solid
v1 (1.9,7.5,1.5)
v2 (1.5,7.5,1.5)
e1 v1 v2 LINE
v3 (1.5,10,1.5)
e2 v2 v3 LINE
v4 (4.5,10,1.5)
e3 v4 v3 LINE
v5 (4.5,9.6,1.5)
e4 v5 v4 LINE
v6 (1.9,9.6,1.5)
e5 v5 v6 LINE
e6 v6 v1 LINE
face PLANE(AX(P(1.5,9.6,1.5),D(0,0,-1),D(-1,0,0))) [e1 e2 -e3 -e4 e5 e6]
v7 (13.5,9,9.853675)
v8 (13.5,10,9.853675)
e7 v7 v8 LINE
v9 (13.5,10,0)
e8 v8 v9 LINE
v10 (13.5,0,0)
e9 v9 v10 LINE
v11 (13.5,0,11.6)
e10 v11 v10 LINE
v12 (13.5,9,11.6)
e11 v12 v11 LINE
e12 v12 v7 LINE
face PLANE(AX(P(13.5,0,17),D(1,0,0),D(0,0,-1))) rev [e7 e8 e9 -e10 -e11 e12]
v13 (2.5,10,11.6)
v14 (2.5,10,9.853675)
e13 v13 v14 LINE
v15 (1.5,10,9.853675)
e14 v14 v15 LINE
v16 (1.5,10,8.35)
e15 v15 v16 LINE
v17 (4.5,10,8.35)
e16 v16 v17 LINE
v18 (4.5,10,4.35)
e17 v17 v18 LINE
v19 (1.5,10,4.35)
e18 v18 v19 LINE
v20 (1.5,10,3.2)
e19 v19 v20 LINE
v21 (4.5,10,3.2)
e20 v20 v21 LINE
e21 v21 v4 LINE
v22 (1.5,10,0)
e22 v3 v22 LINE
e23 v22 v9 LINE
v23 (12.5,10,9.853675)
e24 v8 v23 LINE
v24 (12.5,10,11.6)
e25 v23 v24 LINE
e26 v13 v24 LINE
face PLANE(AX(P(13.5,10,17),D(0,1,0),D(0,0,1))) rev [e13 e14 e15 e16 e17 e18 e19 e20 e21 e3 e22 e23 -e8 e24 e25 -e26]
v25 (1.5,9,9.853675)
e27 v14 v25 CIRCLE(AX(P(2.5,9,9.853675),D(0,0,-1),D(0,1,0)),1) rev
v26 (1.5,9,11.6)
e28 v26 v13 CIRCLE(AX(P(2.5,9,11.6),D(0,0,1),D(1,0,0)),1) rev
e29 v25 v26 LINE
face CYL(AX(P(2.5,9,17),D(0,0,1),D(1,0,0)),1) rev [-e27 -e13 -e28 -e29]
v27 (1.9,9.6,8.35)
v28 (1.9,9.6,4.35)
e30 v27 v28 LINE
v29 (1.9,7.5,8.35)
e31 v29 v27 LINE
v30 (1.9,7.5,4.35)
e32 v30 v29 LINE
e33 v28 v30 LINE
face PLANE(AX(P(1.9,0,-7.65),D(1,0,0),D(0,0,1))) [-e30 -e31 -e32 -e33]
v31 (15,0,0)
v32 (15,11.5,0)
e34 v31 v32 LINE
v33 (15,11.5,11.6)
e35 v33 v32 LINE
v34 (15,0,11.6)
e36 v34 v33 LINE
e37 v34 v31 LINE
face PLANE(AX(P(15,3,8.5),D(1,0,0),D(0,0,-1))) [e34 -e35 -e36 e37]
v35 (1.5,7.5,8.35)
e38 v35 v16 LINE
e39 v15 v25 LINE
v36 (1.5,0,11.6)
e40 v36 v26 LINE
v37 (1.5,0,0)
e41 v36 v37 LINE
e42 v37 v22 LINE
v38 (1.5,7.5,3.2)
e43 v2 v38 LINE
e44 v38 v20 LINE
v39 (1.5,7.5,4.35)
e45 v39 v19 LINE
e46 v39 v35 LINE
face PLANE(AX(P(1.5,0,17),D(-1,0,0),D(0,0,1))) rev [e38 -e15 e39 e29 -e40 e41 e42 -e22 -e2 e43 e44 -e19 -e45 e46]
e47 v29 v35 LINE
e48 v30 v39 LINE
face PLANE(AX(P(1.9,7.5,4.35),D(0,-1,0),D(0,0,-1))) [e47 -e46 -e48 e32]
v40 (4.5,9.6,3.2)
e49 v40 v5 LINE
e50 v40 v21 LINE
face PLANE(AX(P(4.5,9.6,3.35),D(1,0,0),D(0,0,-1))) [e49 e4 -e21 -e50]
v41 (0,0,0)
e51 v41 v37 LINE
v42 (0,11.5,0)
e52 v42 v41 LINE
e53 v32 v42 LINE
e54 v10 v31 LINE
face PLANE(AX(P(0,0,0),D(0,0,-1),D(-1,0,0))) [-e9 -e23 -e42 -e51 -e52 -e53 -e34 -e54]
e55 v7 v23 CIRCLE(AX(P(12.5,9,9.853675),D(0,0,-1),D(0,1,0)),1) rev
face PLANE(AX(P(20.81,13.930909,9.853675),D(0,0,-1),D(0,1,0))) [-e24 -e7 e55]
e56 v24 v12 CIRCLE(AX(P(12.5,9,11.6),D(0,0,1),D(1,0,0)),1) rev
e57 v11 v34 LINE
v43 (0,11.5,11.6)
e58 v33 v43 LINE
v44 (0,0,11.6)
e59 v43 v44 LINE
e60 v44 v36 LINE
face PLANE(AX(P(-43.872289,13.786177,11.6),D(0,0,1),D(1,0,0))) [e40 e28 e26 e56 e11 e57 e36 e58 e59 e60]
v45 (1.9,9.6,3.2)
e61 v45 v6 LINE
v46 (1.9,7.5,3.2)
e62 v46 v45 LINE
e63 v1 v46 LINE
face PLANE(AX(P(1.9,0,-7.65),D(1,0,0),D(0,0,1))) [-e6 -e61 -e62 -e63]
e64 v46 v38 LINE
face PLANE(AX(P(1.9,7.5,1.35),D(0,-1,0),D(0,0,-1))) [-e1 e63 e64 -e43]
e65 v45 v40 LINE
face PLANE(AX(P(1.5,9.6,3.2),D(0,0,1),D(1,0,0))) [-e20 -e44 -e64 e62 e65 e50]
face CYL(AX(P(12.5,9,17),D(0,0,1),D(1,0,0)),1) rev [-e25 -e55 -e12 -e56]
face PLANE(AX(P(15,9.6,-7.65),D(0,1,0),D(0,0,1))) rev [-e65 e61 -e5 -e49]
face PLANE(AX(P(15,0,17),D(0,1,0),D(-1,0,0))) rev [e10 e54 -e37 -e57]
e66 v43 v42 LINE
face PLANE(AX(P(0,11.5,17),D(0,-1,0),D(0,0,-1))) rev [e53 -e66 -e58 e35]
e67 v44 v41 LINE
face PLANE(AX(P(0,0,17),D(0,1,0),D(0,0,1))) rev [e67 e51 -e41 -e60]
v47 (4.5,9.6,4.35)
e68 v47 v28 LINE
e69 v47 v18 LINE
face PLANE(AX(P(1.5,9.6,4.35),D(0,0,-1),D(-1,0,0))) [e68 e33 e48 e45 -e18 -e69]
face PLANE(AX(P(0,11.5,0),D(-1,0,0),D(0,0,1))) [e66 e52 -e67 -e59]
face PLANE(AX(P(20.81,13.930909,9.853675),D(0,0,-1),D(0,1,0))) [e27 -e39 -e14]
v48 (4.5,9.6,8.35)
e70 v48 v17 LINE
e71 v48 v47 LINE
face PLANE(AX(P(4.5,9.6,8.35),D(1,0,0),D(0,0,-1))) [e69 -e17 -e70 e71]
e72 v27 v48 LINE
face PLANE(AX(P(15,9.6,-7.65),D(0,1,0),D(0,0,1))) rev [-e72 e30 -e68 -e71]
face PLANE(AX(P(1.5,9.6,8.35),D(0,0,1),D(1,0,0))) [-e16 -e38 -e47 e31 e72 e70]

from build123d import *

# Parameters (mm, degrees)
BOSS_EXTRUDE1_DEPTH      = 17
SKETCH10_W               = 3
SKETCH10_H               = 4
SKETCH10_H_2             = 2
BOSS_EXTRUDE8_DEPTH      = 0.4
SKETCH11_W               = 2
SKETCH11_H               = 2.1
SKETCH11_W_2             = 4
BOSS_EXTRUDE9_DEPTH      = 0.4
FILLET5_R                = 0.4
SPLIT2_SURFACE_1_BACK    = 26.421
SPLIT2_SURFACE_1_DEPTH   = 52.842
SPLIT2_SURFACE_2_BACK    = 26.421
SPLIT2_SURFACE_2_DEPTH   = 52.842
FILLET6_R                = 1.5
SKETCH13_W               = 5.8
SKETCH13_H               = 8.5
BOSS_EXTRUDE10_DEPTH     = 3
FILLET7_R                = 4
SPLIT3_SURFACE_3_BACK    = 34.598
SPLIT3_SURFACE_3_DEPTH   = 69.196
SPLIT3_SURFACE_4_BACK    = 34.598
SPLIT3_SURFACE_4_DEPTH   = 69.196
CUT_EXTRUDE1_DEPTH       = 1.5
CUT_EXTRUDE2_DEPTH       = 29.664263465
DELETEFACE1_START        = 1.5
DELETEFACE1_DEPTH        = 12
CUT_EXTRUDE3_DEPTH       = 8
MOVE_START               = 1.5
MOVE_FACE1_OUTLINE_W     = 2.5
MOVE_FACE1_OUTLINE_H     = 4
MOVE_FACE1_OUTLINE_H_2   = 2
MOVE_FACE1_DEPTH         = 3
MOVE_FACE1_2_OUTLINE_W   = 0.4
MOVE_FACE1_2_OUTLINE_H   = 2
MOVE_FACE1_2_OUTLINE_H_2 = 4
MOVE_FACE1_2_DEPTH       = 3
MOVE_FACE1_3_OUTLINE_W   = 2.1
MOVE_FACE1_3_OUTLINE_H   = 2
MOVE_FACE1_3_OUTLINE_H_2 = 4
MOVE_FACE1_3_DEPTH       = 0.4
CUT_EXTRUDE4_DEPTH       = 25.456900867
CUT_EXTRUDE4_DEPTH_BACK  = 25.456900867
SPLIT4_SURFACE_5_BACK    = 32.215
SPLIT4_SURFACE_5_DEPTH   = 64.43
SPLIT4_SURFACE_6_BACK    = 32.215
SPLIT4_SURFACE_6_DEPTH   = 64.43
FILLET8_R                = 1
MOVE_START_2             = 1.35
MOVE_FACE2_DEPTH         = 0.15
MOVE_START_3             = 3.2
MOVE_FACE2_2_DEPTH       = 0.15
SPLIT5_START             = -5.8
SPLIT5_OUTLINE_W         = 3
SPLIT5_OUTLINE_H         = 8.5
SPLIT5_DEPTH             = 5.8
SPLIT5_START_2           = 15
SPLIT5_2_OUTLINE_W       = 3
SPLIT5_2_OUTLINE_H       = 8.5
SPLIT5_2_DEPTH           = 5.8
DELETEFACE2_DEPTH        = 1.5
DELETEFACE2_START        = 13.5
DELETEFACE2_2_DEPTH      = 1.5


# Read off the part's stored shape, not the designer's step: DeleteFace1, Move Face1, Move Face2, Split5, DeleteFace2
with BuildPart() as part:
    # Sketch1 → Boss-Extrude1 (new body)
    with BuildSketch(Plane.XY):
        Polygon((0, 0), (1.5, 0), (1.5, 10), (13.5, 10), (13.5, 0), (15, 0), (15, 11.5), (0, 11.5), (0, 10), align=None)
    extrude(amount=BOSS_EXTRUDE1_DEPTH)

    # Sketch10 → Boss-Extrude8 (add)
    with BuildSketch(Plane.XZ.offset(-10)):
        with Locations((12, 14)):
            Rectangle(SKETCH10_W, SKETCH10_H)
        with Locations((12, 10)):
            Rectangle(SKETCH10_W, SKETCH10_H_2)
    boss_extrude8 = extrude(amount=BOSS_EXTRUDE8_DEPTH)

    # Sketch11 → Boss-Extrude9 (add)
    with BuildSketch(Plane.ZY.offset(-13.5)):
        with Locations((10, 8.55)):
            Rectangle(SKETCH11_W, SKETCH11_H)
        with Locations((14, 8.55)):
            Rectangle(SKETCH11_W_2, SKETCH11_H)
    boss_extrude9 = extrude(amount=BOSS_EXTRUDE9_DEPTH)

    # Fillet5
    fillet5_edges = [part.edges().sort_by_distance(p)[0] for p in [
        (13.1, 9.6, 10),
        (13.1, 9.6, 14),
    ]]
    fillet(fillet5_edges, radius=FILLET5_R)


with BuildPart() as body_2:
    # Split2: the piece behind the surface
    add(part.part)
    # Split2 surface: a surface, the sketch's curves swept straight by 52.842 mm
    with BuildLine(Plane.XZ.offset(-SPLIT2_SURFACE_1_BACK), mode=Mode.PRIVATE) as split2_surface_1_path:
        Line((15, 8), (0, 8))
    split2_surface_1 = Shell.extrude(split2_surface_1_path.wire(), (0 * SPLIT2_SURFACE_1_DEPTH, -1 * SPLIT2_SURFACE_1_DEPTH, 0 * SPLIT2_SURFACE_1_DEPTH))
    split(bisect_by=split2_surface_1, keep=Keep.BOTTOM)


with BuildPart() as part_1:
    add(part.part)

    # Split2: split by a surface, the side it looks to stays
    # Split2 surface: a surface, the sketch's curves swept straight by 52.842 mm
    with BuildLine(Plane.XZ.offset(-SPLIT2_SURFACE_2_BACK), mode=Mode.PRIVATE) as split2_surface_2_path:
        Line((15, 8), (0, 8))
    split2_surface_2 = Shell.extrude(split2_surface_2_path.wire(), (0 * SPLIT2_SURFACE_2_DEPTH, -1 * SPLIT2_SURFACE_2_DEPTH, 0 * SPLIT2_SURFACE_2_DEPTH))
    split(bisect_by=split2_surface_2, keep=Keep.TOP)

    # Fillet6
    fillet6_edges = [part_1.edges().sort_by_distance(p)[0] for p in [
        (13.5, 10, 4),
        (1.5, 10, 4),
    ]]
    fillet(fillet6_edges, radius=FILLET6_R)


with BuildPart() as body_2_1:
    add(body_2.part)

    # Combine2: union part
    add(part_1.part)

    # Sketch13 → Boss-Extrude10 (add)
    with BuildSketch(Plane.XZ):
        with Locations((-2.9, 4.25)):
            Rectangle(SKETCH13_W, SKETCH13_H)
        with Locations((17.9, 4.25)):
            Rectangle(SKETCH13_W, SKETCH13_H)
    extrude(amount=-BOSS_EXTRUDE10_DEPTH)

    # Fillet7
    fillet7_edges = [body_2_1.edges().sort_by_distance(p)[0] for p in [
        (20.8, 1.5, 8.5),
        (20.8, 1.5, 0),
        (-5.8, 1.5, 0),
        (-5.8, 1.5, 8.5),
    ]]
    fillet(fillet7_edges, radius=FILLET7_R)


with BuildPart() as body_2_2:
    # Split3: the piece behind the surface
    add(body_2_1.part)
    # Split3 surface: a surface, the sketch's curves swept straight by 69.196 mm
    with BuildLine(Plane.ZY.offset(-SPLIT3_SURFACE_3_BACK), mode=Mode.PRIVATE) as split3_surface_3_path:
        Line((0, 3), (17, 3))
    split3_surface_3 = Shell.extrude(split3_surface_3_path.wire(), (-1 * SPLIT3_SURFACE_3_DEPTH, 0 * SPLIT3_SURFACE_3_DEPTH, 0 * SPLIT3_SURFACE_3_DEPTH))
    split(bisect_by=split3_surface_3, keep=Keep.BOTTOM)

    # Sketch16 → Cut-Extrude1 (cut)
    with BuildSketch(Plane(origin=(0, 3, 0), x_dir=(1, 0, 0), z_dir=(0, 1, 0))):
        Polygon((-1, -7.136751346), (1.5, -5.693375673), (1.5, -2.806624327), (-1, -1.363248654), (-3.5, -2.806624327), (-3.5, -5.693375673), align=None)
        Polygon((16, -1.363248654), (13.5, -2.806624327), (13.5, -5.693375673), (16, -7.136751346), (18.5, -5.693375673), (18.5, -2.806624327), align=None)
    extrude(amount=-CUT_EXTRUDE1_DEPTH, mode=Mode.SUBTRACT)

    # Sketch17 → Cut-Extrude2 (cut, through all)
    with BuildSketch(Plane(origin=(0, 1.5, 0), x_dir=(1, 0, 0), z_dir=(0, 1, 0))):
        with BuildLine():
            Line((16, -5.25), (13.5, -5.25))
            Line((13.5, -5.25), (13.5, -3.25))
            Line((13.5, -3.25), (16, -3.25))
            ThreePointArc((16, -3.25), (17, -4.25), (16, -5.25))
        make_face()
        with BuildLine():
            Line((1.5, -3.25), (1.5, -5.25))
            Line((1.5, -5.25), (-1, -5.25))
            ThreePointArc((-1, -5.25), (-2, -4.25), (-1, -3.25))
            Line((-1, -3.25), (1.5, -3.25))
        make_face()
    extrude(amount=-CUT_EXTRUDE2_DEPTH, mode=Mode.SUBTRACT)


with BuildPart() as body_2_3:
    add(body_2_1.part)

    # Split3: split by a surface, the side it looks to stays
    # Split3 surface: a surface, the sketch's curves swept straight by 69.196 mm
    with BuildLine(Plane.ZY.offset(-SPLIT3_SURFACE_4_BACK), mode=Mode.PRIVATE) as split3_surface_4_path:
        Line((0, 3), (17, 3))
    split3_surface_4 = Shell.extrude(split3_surface_4_path.wire(), (-1 * SPLIT3_SURFACE_4_DEPTH, 0 * SPLIT3_SURFACE_4_DEPTH, 0 * SPLIT3_SURFACE_4_DEPTH))
    split(bisect_by=split3_surface_4, keep=Keep.TOP)

    # Combine3: union body 2 2
    add(body_2_2.part)

    # DeleteFace1 outline → DeleteFace1 (cut)
    with BuildSketch(Plane.YZ.offset(DELETEFACE1_START)):
        Polygon((10, -1), (10, 8), (10, 9), (7, 9), (7, -1), align=None)
    extrude(amount=DELETEFACE1_DEPTH, mode=Mode.SUBTRACT)

    # Mirror1: Boss-Extrude8, Boss-Extrude9 across plane
    add(boss_extrude8.mirror(Plane.ZY.offset(-7.5)))
    add(boss_extrude9.mirror(Plane.ZY.offset(-7.5)))

    # Sketch18 → Cut-Extrude3 (cut)
    with BuildSketch(Plane.XY.offset(16)):
        with BuildLine():
            Line((13.5, 10), (10.5, 10))
            Line((10.5, 10), (10.5, 9.6))
            Line((10.5, 9.6), (12.7, 9.6))
            ThreePointArc((12.7, 9.6), (12.982842712, 9.482842712), (13.1, 9.2))
            Line((13.1, 9.2), (13.1, 7.5))
            Line((13.1, 7.5), (13.5, 7.5))
            Line((13.5, 7.5), (13.5, 10))
        make_face()
    extrude(amount=-CUT_EXTRUDE3_DEPTH, mode=Mode.SUBTRACT)

    # Move Face1 outline → Move Face1 (cut)
    with BuildSketch(Plane.YZ.offset(MOVE_START)):
        with Locations((8.75, 14)):
            Rectangle(MOVE_FACE1_OUTLINE_W, MOVE_FACE1_OUTLINE_H)
        with Locations((8.75, 10)):
            Rectangle(MOVE_FACE1_OUTLINE_W, MOVE_FACE1_OUTLINE_H_2)
    extrude(amount=MOVE_FACE1_DEPTH, mode=Mode.SUBTRACT)

    # Move Face1 2 outline → Move Face1 2 (add)
    with BuildSketch(Plane.YZ.offset(MOVE_START)):
        with Locations((9.8, 2.35)):
            Rectangle(MOVE_FACE1_2_OUTLINE_W, MOVE_FACE1_2_OUTLINE_H)
        with Locations((9.8, 6.35)):
            Rectangle(MOVE_FACE1_2_OUTLINE_W, MOVE_FACE1_2_OUTLINE_H_2)
    extrude(amount=MOVE_FACE1_2_DEPTH)

    # Move Face1 3 outline → Move Face1 3 (add)
    with BuildSketch(Plane.YZ.offset(MOVE_START)):
        with Locations((8.55, 2.35)):
            Rectangle(MOVE_FACE1_3_OUTLINE_W, MOVE_FACE1_3_OUTLINE_H)
        with Locations((8.55, 6.35)):
            Rectangle(MOVE_FACE1_3_OUTLINE_W, MOVE_FACE1_3_OUTLINE_H_2)
    extrude(amount=MOVE_FACE1_3_DEPTH)

    # Sketch19 → Cut-Extrude4 (cut, two sides: drawn at the far end of the back side and taken through both)
    with BuildSketch(Plane.ZY.offset(-7.5).offset(-CUT_EXTRUDE4_DEPTH_BACK)):
        Polygon((11.6, 62.452218571), (11.6, 13.786177198), (11.6, -3.966275857), (11.6, -52.632317231), (108.932082748, -52.632317231), (108.932082748, 62.452218571), align=None)
    extrude(amount=CUT_EXTRUDE4_DEPTH + CUT_EXTRUDE4_DEPTH_BACK, mode=Mode.SUBTRACT)


with BuildPart() as body_2_3_1:
    # Split4: the piece behind the surface
    add(body_2_3.part)
    # Split4 surface: a surface, the sketch's curves swept straight by 64.43 mm
    with BuildLine(Plane.ZY.offset(-7.5).offset(-SPLIT4_SURFACE_5_BACK), mode=Mode.PRIVATE) as split4_surface_5_path:
        Line((9.853674878, 13.930908587), (9.853674878, -3.706091584))
    split4_surface_5 = Shell.extrude(split4_surface_5_path.wire(), (-1 * SPLIT4_SURFACE_5_DEPTH, 0 * SPLIT4_SURFACE_5_DEPTH, 0 * SPLIT4_SURFACE_5_DEPTH))
    split(bisect_by=split4_surface_5, keep=Keep.BOTTOM)


with BuildPart() as body_2_4:
    add(body_2_3.part)

    # Split4: split by a surface, the side it looks to stays
    # Split4 surface: a surface, the sketch's curves swept straight by 64.43 mm
    with BuildLine(Plane.ZY.offset(-7.5).offset(-SPLIT4_SURFACE_6_BACK), mode=Mode.PRIVATE) as split4_surface_6_path:
        Line((9.853674878, 13.930908587), (9.853674878, -3.706091584))
    split4_surface_6 = Shell.extrude(split4_surface_6_path.wire(), (-1 * SPLIT4_SURFACE_6_DEPTH, 0 * SPLIT4_SURFACE_6_DEPTH, 0 * SPLIT4_SURFACE_6_DEPTH))
    split(bisect_by=split4_surface_6, keep=Keep.TOP)

    # Fillet8
    fillet8_edges = [body_2_4.edges().sort_by_distance(p)[0] for p in [
        (1.5, 10, 10.726837439),
        (13.5, 10, 10.726837439),
    ]]
    fillet(fillet8_edges, radius=FILLET8_R)

    # Combine4: union body 2 3
    add(body_2_3_1.part)

    # Move Face2 outline → Move Face2 (cut)
    with BuildSketch(Plane.XY.offset(MOVE_START_2)):
        Polygon((4.5, 10), (1.5, 10), (1.5, 7.5), (1.9, 7.5), (1.9, 9.6), (4.5, 9.6), align=None)
    extrude(amount=MOVE_FACE2_DEPTH, mode=Mode.SUBTRACT)

    # Move Face2 2 outline → Move Face2 2 (cut)
    with BuildSketch(Plane.XY.offset(MOVE_START_3)):
        Polygon((4.5, 10), (1.5, 10), (1.5, 7.5), (1.9, 7.5), (1.9, 9.6), (4.5, 9.6), align=None)
    extrude(amount=MOVE_FACE2_2_DEPTH, mode=Mode.SUBTRACT)

    # Split5 outline → Split5 (cut)
    with BuildSketch(Plane.YZ.offset(SPLIT5_START)):
        with Locations((1.5, 4.25)):
            Rectangle(SPLIT5_OUTLINE_W, SPLIT5_OUTLINE_H)
    extrude(amount=SPLIT5_DEPTH, mode=Mode.SUBTRACT)

    # Split5 2 outline → Split5 2 (cut)
    with BuildSketch(Plane.YZ.offset(SPLIT5_START_2)):
        with Locations((1.5, 4.25)):
            Rectangle(SPLIT5_2_OUTLINE_W, SPLIT5_2_OUTLINE_H)
    extrude(amount=SPLIT5_2_DEPTH, mode=Mode.SUBTRACT)

    # DeleteFace2 outline → DeleteFace2 (add)
    with BuildSketch(Plane.YZ):
        Polygon((0, 3.25), (0, 0), (4, 0), (4, 8), (0, 8), (0, 5.25), align=None)
    extrude(amount=DELETEFACE2_DEPTH)

    # DeleteFace2 2 outline → DeleteFace2 2 (add)
    with BuildSketch(Plane.YZ.offset(DELETEFACE2_START)):
        Polygon((0, 3.25), (0, 0), (4, 0), (4, 8), (0, 8), (0, 5.25), align=None)
    extrude(amount=DELETEFACE2_2_DEPTH)


solid = body_2_4.part
